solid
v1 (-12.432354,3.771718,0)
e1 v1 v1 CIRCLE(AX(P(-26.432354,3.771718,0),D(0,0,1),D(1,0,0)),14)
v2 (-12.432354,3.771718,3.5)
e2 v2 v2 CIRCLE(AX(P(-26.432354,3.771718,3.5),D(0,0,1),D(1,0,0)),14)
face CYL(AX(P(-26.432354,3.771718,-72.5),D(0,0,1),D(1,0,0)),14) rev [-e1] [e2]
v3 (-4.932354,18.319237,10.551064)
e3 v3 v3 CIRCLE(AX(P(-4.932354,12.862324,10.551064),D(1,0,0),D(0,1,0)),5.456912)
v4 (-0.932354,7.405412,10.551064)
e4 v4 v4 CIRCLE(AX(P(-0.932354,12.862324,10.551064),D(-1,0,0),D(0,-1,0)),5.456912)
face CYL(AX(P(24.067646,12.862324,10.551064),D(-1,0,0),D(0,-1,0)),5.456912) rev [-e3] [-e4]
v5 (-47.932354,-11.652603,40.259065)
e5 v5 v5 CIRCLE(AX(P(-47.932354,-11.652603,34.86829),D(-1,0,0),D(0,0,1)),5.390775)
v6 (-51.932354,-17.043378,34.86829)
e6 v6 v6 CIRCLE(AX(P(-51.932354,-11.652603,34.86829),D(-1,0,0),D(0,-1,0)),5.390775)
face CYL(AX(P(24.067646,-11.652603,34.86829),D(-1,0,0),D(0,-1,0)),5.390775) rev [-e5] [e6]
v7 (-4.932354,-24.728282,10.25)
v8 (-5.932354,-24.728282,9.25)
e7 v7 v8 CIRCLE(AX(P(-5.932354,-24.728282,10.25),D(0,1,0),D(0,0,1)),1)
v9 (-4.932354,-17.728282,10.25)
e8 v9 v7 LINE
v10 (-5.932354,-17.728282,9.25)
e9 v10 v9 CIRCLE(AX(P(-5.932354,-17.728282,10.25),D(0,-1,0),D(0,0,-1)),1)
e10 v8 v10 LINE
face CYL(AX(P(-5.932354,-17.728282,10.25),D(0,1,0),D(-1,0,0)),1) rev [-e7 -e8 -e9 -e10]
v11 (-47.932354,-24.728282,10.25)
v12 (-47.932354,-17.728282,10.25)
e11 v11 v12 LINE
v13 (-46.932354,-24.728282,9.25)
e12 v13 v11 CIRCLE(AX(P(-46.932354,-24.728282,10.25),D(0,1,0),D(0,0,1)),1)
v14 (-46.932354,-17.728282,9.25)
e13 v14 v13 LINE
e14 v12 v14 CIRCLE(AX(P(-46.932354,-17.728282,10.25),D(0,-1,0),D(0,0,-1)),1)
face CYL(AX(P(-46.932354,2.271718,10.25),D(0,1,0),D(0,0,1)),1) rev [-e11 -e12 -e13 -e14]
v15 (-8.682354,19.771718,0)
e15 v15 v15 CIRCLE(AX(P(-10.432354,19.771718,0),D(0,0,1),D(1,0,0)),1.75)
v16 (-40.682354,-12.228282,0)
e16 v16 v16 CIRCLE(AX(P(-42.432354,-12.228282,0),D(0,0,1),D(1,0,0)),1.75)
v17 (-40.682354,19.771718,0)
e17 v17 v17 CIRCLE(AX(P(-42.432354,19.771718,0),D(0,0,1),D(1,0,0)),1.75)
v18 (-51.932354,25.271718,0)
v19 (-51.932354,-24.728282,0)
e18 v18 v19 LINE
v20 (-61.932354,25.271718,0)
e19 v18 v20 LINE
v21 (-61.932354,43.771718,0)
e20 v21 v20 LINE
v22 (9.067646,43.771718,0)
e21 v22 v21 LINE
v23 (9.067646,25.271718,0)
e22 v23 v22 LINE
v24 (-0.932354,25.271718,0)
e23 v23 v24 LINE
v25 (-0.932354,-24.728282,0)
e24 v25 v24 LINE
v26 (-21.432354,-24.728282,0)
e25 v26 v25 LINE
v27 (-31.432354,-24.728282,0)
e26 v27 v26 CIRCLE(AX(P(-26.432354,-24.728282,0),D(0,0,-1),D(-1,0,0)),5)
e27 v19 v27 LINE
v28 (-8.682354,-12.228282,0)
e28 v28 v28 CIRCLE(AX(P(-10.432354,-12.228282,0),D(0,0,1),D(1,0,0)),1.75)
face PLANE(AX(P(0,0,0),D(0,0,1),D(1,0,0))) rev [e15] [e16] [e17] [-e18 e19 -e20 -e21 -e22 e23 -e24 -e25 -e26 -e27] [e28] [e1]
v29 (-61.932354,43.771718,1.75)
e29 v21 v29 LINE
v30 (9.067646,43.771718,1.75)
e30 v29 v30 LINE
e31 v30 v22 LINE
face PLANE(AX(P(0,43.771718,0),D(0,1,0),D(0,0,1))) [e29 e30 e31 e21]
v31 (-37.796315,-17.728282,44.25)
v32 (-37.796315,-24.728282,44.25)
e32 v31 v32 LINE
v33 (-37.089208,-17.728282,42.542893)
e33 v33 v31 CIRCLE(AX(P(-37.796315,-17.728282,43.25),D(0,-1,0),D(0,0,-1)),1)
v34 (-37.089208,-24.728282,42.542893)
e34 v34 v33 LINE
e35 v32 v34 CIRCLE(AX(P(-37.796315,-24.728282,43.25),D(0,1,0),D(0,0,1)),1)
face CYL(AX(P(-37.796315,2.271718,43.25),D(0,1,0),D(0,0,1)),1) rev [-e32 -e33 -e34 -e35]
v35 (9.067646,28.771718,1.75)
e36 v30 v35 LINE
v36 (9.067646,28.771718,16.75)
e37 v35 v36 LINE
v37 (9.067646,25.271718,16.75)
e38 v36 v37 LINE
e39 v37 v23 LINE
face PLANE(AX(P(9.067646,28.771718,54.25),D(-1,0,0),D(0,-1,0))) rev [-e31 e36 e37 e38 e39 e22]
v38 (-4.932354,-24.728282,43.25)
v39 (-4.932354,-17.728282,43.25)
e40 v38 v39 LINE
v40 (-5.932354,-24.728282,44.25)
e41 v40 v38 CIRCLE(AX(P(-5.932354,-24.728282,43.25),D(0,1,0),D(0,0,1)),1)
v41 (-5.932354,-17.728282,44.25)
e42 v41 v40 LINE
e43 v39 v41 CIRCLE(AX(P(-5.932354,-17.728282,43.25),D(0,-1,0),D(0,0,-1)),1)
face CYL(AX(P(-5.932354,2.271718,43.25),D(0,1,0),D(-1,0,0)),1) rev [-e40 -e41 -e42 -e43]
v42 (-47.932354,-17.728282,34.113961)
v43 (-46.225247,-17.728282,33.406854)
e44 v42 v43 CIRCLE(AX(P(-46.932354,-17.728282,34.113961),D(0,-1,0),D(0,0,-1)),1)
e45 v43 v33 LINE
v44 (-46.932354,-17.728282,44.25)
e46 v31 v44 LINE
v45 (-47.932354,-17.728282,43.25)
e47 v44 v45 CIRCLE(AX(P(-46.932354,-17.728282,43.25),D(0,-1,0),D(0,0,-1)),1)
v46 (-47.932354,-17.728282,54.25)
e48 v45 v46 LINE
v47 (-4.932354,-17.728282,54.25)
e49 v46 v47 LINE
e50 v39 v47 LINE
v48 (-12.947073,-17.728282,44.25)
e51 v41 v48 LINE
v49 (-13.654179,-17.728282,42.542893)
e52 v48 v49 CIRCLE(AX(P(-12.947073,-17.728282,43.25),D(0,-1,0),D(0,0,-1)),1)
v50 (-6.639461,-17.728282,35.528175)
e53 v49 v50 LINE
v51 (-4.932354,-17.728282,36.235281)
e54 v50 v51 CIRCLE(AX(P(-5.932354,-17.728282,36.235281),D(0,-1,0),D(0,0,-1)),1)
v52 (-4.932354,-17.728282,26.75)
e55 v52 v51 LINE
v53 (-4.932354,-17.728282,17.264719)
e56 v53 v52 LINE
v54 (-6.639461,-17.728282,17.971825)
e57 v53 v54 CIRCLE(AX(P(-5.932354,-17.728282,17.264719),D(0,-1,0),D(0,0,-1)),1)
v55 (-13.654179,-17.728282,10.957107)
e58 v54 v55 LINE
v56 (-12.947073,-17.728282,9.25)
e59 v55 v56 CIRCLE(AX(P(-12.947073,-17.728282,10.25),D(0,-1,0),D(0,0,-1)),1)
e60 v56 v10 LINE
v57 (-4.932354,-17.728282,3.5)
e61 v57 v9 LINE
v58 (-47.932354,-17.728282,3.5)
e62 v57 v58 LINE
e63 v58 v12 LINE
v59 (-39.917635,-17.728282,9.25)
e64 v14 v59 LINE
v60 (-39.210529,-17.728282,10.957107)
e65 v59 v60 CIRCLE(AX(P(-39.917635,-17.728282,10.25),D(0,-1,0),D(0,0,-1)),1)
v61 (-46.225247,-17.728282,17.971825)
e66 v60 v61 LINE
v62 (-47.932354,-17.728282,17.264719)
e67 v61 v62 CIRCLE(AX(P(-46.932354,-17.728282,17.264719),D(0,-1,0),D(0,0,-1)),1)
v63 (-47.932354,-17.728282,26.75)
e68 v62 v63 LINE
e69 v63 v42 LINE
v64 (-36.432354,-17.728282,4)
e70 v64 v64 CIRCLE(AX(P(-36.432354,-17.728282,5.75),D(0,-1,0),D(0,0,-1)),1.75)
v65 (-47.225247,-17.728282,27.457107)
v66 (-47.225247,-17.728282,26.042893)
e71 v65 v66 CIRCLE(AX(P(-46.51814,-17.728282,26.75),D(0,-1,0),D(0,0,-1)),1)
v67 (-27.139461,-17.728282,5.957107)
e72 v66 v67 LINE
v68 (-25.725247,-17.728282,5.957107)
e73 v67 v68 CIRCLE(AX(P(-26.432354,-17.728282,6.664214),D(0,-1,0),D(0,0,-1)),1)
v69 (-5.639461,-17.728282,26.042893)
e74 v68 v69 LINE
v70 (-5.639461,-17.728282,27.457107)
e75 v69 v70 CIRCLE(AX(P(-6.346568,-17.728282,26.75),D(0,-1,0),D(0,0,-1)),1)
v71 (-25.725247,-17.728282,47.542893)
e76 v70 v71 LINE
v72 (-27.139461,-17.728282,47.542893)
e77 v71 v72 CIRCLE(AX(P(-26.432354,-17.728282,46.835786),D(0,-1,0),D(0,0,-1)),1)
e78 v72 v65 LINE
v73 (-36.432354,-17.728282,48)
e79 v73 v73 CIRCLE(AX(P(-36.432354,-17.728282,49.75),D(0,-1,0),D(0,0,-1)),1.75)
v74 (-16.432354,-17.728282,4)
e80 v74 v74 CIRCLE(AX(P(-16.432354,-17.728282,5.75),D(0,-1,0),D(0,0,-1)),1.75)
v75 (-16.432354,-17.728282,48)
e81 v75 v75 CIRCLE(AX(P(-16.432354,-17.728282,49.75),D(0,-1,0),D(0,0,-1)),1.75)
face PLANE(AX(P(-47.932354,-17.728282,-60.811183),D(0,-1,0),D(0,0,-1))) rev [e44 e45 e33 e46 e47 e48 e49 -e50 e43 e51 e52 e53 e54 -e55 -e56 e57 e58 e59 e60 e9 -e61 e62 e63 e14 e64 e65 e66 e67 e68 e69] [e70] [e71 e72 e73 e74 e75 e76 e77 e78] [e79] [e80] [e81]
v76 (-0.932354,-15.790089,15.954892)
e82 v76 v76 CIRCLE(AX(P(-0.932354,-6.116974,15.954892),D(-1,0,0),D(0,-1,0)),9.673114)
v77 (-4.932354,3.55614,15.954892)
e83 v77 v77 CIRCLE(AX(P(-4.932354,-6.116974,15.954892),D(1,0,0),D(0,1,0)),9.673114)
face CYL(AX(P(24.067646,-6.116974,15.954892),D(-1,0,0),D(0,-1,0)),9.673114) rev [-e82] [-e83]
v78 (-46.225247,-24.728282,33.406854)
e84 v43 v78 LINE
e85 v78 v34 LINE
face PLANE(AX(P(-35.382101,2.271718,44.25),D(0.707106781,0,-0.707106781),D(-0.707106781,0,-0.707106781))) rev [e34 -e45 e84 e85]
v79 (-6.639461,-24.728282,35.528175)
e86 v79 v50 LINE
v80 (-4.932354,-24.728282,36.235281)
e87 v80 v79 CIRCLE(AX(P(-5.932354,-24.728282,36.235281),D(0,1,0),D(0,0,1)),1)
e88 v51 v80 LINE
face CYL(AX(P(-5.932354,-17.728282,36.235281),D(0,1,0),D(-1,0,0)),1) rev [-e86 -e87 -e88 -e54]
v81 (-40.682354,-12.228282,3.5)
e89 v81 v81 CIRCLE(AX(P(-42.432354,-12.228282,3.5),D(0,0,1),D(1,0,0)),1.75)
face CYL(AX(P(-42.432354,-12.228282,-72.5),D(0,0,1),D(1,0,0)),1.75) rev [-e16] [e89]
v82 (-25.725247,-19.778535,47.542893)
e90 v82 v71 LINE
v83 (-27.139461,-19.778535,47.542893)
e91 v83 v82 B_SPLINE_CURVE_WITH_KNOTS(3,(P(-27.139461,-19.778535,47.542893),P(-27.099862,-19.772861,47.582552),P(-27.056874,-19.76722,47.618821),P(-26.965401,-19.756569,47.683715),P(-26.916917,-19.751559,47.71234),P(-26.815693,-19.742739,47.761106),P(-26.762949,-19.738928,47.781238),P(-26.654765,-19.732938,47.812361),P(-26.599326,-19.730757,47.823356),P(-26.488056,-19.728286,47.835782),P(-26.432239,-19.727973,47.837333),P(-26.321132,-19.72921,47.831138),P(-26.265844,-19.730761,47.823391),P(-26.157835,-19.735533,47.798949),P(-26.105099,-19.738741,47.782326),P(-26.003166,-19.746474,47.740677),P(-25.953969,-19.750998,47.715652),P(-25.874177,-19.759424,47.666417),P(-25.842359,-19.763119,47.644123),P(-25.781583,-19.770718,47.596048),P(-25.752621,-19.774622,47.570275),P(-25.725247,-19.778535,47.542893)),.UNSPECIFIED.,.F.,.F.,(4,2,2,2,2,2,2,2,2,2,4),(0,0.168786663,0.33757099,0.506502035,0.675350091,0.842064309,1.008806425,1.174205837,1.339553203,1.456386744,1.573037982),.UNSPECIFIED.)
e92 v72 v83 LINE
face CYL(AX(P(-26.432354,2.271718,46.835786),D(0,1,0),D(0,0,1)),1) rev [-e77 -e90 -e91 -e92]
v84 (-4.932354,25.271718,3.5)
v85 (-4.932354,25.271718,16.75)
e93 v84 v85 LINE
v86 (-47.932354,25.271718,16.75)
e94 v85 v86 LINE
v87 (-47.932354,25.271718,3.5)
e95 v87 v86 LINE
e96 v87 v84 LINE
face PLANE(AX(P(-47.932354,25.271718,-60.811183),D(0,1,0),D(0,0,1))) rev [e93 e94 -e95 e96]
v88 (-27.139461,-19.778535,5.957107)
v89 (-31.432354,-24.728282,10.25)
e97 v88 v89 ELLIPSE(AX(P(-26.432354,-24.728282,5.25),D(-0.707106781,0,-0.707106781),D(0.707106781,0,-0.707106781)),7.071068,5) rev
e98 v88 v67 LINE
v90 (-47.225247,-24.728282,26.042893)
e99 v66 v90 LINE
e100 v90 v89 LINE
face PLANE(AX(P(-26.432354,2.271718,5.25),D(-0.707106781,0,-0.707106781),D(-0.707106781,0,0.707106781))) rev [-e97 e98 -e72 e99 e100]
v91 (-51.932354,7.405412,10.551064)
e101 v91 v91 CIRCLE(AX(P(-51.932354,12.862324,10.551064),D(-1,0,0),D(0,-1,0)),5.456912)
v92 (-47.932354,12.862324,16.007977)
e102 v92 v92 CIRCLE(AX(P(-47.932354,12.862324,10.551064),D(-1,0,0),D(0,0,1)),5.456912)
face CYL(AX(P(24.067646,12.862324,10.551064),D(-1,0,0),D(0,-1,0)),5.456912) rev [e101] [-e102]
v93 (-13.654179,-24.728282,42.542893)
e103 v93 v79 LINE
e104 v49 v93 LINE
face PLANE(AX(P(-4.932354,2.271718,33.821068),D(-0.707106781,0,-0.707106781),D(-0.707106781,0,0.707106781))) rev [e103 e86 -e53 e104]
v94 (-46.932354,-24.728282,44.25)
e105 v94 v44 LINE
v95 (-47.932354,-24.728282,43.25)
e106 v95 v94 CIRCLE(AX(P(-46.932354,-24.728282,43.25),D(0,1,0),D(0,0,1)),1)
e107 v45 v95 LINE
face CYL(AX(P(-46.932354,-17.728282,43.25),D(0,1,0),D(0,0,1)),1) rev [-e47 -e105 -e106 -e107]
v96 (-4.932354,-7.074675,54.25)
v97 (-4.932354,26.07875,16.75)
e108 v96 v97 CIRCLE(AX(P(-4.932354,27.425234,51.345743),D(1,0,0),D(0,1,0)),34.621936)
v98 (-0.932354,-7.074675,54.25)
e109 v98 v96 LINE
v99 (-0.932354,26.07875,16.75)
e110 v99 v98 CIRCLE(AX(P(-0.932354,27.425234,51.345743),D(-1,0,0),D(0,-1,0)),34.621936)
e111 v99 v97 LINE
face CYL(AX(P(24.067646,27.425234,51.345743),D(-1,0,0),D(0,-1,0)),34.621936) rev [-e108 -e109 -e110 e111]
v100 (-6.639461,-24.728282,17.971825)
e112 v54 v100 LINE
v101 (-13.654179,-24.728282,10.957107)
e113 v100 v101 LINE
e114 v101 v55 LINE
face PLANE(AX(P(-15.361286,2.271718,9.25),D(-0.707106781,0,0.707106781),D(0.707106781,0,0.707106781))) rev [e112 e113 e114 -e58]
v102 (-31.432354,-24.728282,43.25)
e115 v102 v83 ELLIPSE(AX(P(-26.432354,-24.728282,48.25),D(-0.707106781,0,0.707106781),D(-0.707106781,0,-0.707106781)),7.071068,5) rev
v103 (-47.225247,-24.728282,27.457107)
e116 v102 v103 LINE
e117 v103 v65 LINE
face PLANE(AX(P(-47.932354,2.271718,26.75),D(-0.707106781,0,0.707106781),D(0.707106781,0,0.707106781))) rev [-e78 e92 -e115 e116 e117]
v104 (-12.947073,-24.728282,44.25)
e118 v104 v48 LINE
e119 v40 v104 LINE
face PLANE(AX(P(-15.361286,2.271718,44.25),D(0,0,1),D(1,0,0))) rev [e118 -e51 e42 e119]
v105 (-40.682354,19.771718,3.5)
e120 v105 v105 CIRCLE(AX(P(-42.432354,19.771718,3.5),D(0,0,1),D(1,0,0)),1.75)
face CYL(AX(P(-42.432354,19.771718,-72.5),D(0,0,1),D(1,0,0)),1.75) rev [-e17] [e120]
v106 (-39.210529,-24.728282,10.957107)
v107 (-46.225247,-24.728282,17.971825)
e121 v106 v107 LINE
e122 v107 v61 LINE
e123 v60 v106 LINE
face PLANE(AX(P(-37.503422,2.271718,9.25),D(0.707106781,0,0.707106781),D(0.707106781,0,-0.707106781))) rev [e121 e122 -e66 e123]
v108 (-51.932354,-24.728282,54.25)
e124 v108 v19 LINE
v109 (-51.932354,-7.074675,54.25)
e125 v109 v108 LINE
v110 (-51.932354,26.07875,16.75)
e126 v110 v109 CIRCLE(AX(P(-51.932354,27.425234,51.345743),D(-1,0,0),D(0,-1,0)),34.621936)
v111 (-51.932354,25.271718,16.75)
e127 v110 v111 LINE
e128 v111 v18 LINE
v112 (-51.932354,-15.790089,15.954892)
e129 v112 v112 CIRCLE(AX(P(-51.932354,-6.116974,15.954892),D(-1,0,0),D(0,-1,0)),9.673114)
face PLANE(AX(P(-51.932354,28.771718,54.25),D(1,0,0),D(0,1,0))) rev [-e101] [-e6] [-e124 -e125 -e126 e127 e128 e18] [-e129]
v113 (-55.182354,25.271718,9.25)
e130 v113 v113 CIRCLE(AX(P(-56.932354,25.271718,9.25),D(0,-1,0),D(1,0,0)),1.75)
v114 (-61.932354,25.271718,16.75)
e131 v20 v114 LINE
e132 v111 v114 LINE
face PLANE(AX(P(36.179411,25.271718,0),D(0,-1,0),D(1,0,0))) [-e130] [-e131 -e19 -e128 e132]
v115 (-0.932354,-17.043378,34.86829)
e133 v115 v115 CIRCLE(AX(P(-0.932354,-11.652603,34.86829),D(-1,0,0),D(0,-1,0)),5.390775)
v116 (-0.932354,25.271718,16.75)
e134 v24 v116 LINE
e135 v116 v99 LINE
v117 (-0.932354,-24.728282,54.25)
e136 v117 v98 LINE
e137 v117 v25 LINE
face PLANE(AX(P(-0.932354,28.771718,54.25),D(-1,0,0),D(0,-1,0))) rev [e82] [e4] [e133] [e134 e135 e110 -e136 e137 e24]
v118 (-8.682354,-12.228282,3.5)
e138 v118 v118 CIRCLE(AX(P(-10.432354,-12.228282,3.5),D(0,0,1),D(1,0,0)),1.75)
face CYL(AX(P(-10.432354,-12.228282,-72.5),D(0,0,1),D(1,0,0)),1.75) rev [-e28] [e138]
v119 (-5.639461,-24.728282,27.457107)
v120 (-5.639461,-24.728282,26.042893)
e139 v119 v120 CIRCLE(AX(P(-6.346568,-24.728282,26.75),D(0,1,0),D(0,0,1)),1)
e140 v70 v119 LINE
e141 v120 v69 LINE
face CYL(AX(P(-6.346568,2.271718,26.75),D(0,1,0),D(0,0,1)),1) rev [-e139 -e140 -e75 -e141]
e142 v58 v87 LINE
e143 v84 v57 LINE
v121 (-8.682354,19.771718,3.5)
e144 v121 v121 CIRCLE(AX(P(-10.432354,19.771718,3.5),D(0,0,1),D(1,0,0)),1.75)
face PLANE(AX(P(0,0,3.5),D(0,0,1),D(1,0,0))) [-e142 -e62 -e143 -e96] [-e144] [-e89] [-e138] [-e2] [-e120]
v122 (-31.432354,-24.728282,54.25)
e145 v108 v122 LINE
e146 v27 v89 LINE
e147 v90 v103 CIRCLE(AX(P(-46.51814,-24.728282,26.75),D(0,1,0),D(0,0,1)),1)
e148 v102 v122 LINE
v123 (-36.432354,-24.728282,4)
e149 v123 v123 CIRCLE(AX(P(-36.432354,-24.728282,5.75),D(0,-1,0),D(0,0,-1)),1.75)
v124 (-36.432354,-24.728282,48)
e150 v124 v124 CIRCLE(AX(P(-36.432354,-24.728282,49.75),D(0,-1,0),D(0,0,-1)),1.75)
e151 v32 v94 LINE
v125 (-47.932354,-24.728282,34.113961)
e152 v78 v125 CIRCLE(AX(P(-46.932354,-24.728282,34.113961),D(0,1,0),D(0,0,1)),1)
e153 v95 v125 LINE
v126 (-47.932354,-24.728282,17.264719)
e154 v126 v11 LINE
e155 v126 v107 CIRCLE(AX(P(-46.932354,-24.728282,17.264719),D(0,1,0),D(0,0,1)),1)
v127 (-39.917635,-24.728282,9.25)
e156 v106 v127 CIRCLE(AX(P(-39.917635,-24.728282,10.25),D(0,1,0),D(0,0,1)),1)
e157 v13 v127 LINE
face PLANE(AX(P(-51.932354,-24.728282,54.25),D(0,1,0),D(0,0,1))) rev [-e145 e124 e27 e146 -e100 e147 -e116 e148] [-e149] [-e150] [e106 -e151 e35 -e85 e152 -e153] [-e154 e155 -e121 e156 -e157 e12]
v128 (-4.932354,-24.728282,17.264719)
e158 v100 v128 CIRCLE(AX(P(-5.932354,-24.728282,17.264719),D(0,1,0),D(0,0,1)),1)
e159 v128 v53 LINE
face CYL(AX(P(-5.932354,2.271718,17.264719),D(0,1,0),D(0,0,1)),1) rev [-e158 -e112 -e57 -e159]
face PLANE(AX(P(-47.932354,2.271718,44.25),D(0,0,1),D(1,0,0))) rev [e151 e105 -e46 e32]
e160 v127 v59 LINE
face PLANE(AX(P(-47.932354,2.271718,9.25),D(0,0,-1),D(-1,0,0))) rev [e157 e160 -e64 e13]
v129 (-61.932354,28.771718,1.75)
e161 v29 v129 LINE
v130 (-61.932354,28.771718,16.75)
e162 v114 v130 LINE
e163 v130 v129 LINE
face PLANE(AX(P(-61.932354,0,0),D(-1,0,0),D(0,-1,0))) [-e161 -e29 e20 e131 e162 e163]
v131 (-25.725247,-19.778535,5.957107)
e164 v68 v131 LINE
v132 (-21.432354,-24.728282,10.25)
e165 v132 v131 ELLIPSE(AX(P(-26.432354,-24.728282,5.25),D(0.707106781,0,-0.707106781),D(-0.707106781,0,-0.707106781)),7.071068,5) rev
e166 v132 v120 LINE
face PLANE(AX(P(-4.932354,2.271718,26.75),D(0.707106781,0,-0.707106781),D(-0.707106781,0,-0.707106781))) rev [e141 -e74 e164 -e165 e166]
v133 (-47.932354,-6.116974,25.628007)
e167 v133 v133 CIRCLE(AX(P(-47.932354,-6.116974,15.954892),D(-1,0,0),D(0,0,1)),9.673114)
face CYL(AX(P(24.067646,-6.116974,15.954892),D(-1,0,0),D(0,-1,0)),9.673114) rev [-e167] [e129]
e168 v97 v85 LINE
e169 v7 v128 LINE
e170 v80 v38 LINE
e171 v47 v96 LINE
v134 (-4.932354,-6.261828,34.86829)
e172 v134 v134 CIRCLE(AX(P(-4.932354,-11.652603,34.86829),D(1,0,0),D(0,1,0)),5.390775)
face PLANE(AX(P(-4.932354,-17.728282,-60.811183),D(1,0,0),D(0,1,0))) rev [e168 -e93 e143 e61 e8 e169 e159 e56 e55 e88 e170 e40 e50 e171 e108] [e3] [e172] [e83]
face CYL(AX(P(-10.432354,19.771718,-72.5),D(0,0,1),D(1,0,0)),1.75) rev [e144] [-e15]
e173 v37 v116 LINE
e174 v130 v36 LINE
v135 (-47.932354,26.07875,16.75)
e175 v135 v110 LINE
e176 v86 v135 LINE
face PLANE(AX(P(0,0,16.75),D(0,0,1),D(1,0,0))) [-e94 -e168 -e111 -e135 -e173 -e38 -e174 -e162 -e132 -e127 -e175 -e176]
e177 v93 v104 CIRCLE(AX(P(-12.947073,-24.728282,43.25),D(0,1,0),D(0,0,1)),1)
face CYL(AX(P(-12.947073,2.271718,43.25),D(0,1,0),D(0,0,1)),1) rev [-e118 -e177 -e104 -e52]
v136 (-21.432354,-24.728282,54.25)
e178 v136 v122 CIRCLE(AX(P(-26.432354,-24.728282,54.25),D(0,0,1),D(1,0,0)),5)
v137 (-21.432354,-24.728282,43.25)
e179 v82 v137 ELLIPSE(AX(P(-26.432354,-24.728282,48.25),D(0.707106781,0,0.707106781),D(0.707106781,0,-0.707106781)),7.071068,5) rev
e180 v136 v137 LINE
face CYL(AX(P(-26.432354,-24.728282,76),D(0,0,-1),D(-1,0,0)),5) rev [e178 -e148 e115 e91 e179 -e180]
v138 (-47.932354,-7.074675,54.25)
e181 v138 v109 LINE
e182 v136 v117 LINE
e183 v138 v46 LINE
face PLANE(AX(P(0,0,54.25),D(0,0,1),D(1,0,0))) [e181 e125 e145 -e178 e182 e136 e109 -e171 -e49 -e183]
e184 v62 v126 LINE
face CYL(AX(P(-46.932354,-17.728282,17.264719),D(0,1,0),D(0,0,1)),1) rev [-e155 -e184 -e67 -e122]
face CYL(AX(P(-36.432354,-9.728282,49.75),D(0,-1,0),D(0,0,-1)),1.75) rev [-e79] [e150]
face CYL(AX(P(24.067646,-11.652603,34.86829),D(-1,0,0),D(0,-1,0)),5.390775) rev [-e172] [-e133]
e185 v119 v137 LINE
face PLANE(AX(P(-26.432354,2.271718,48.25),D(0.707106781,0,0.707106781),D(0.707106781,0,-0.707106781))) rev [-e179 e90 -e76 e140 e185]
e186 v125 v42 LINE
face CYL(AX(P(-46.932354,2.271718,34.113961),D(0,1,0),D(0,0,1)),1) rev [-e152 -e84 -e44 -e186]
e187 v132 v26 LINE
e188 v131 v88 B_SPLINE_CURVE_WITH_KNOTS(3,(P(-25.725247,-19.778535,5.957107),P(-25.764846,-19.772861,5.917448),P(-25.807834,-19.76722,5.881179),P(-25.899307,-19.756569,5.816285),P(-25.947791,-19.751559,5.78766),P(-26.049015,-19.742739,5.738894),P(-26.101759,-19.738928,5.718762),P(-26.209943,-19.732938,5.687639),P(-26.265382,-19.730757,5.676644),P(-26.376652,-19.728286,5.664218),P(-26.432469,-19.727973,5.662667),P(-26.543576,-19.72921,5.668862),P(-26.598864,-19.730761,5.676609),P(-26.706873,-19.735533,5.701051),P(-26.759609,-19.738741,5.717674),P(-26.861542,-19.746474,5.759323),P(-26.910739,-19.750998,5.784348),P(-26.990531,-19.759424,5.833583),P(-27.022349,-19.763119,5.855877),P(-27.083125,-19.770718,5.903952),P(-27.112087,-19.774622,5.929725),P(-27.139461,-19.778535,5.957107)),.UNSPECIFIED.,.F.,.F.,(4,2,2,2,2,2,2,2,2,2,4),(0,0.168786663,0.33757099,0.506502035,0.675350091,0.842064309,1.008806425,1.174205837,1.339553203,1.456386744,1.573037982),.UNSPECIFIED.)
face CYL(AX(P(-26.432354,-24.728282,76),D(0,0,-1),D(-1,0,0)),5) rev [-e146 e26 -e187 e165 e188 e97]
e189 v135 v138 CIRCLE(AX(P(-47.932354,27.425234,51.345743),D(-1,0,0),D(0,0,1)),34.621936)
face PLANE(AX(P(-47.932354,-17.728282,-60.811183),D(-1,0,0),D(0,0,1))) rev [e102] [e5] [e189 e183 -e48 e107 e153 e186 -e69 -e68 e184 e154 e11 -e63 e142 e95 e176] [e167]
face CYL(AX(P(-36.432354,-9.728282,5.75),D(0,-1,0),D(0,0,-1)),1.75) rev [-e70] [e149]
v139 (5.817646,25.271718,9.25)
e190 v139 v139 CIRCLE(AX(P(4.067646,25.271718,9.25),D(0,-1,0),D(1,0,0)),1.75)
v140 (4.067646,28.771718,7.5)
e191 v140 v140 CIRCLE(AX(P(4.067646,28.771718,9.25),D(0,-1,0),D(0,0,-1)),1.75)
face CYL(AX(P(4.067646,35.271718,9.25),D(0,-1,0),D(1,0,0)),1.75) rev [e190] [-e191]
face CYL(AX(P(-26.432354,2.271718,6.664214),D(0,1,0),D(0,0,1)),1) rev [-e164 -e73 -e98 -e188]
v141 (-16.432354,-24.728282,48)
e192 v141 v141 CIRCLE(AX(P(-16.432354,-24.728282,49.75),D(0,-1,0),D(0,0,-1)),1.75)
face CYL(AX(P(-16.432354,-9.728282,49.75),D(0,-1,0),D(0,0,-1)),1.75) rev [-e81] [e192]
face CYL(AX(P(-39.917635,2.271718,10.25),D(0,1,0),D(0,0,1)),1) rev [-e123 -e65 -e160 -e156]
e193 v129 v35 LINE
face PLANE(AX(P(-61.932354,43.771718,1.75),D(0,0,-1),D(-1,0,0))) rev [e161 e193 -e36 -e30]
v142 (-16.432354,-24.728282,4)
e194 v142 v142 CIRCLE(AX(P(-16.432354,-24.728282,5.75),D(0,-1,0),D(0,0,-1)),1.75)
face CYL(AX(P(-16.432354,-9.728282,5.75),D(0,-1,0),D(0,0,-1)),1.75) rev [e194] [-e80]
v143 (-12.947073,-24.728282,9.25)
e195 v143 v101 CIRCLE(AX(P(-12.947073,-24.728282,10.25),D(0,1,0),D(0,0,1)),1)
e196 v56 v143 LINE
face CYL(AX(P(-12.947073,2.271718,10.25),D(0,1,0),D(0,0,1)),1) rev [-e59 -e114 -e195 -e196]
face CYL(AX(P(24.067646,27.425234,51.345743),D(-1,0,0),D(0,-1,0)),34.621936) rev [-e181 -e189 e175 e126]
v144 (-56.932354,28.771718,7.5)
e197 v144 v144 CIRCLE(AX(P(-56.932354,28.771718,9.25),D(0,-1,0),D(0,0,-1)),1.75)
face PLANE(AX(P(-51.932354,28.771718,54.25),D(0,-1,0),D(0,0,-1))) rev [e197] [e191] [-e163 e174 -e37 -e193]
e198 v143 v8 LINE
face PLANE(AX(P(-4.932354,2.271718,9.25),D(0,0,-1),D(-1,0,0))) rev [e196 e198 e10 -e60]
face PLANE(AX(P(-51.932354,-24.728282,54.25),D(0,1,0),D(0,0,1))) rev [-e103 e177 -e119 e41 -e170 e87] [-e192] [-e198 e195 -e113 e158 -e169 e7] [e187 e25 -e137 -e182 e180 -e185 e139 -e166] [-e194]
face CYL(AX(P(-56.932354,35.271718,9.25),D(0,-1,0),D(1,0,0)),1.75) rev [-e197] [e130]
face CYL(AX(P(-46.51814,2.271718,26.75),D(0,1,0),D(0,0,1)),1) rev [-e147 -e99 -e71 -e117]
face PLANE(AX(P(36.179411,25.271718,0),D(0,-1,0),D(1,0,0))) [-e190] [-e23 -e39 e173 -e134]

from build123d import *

# Parameters (mm, degrees)
SKETCH1_W                = 51
SKETCH1_H                = 53.5
BOSS_EXTRUDE1_DEPTH      = 54.25
SKETCH2_W                = 43
SKETCH2_H                = 43
CUT_EXTRUDE1_DEPTH       = 50.75
SKETCH3_W                = 43
SKETCH3_H                = 3.5
CUT_EXTRUDE2_DEPTH       = 37.5
CUT_EXTRUDE3_DEPTH       = 76
SKETCH5_R                = 9.673114497
SKETCH5_R_2              = 5.390775308
SKETCH5_R_3              = 5.456912487
CUT_EXTRUDE4_DEPTH       = 76
SKETCH6_R                = 14
SKETCH6_R_2              = 1.75
CUT_EXTRUDE5_DEPTH       = 76
SKETCH7_R                = 5
CUT_EXTRUDE6_DEPTH       = 76
CUT_EXTRUDE7_DEPTH       = 27
FILLET2_R                = 1
SKETCH12_R               = 1.75
CUT_EXTRUDE8_DEPTH       = 15
BOSS_EXTRUDE4_DEPTH      = 10
BOSS_EXTRUDE4_DEPTH_BACK = 61
SKETCH13_W               = 16.75
SKETCH13_H               = 3.5
SKETCH14_W               = 71
SKETCH14_H               = 1.75
BOSS_EXTRUDE5_DEPTH      = 15
SKETCH15_R               = 1.75
CUT_EXTRUDE9_DEPTH       = 10


with BuildPart() as part:
    # Sketch1 → Boss-Extrude1 (new body)
    with BuildSketch(Plane.XY):
        with Locations((-26.432354029, 2.021717979)):
            Rectangle(SKETCH1_W, SKETCH1_H)
    extrude(amount=BOSS_EXTRUDE1_DEPTH)

    # Sketch2 → Cut-Extrude1 (cut)
    with BuildSketch(Plane.XY.offset(54.25)):
        with Locations((-26.432354029, 3.771717979)):
            Rectangle(SKETCH2_W, SKETCH2_H)
    extrude(amount=-CUT_EXTRUDE1_DEPTH, mode=Mode.SUBTRACT)

    # Sketch3 → Cut-Extrude2 (cut)
    with BuildSketch(Plane.XY.offset(54.25)):
        with Locations((-26.432354029, 27.021717979)):
            Rectangle(SKETCH3_W, SKETCH3_H)
    extrude(amount=-CUT_EXTRUDE2_DEPTH, mode=Mode.SUBTRACT)

    # Sketch4 → Cut-Extrude3 (cut)
    with BuildSketch(Plane.ZY.offset(51.932354029)):
        with BuildLine():
            Line((16.75, 28.771717979), (54.25, 28.771717979))
            Line((54.25, 28.771717979), (54.25, -7.074674815))
            ThreePointArc((54.25, -7.074674815), (27.422353926, 2.398250742), (16.75, 28.771717979))
        make_face()
    extrude(amount=-CUT_EXTRUDE3_DEPTH, mode=Mode.SUBTRACT)

    # Sketch5 → Cut-Extrude4 (cut)
    with BuildSketch(Plane.ZY.offset(51.932354029)):
        with Locations(Location((15.954892055, -6.11697424, 0), (0, 0, 270))):
            Circle(SKETCH5_R)
        with Locations(Location((34.868290168, -11.652602956, 0), (0, 0, 270))):
            Circle(SKETCH5_R_2)
        with Locations(Location((10.551064023, 12.862324215, 0), (0, 0, 270))):
            Circle(SKETCH5_R_3)
    extrude(amount=-CUT_EXTRUDE4_DEPTH, mode=Mode.SUBTRACT)

    # Sketch6 → Cut-Extrude5 (cut)
    with BuildSketch(Plane.XY.offset(3.5)):
        with Locations((-26.432354029, 3.771717979)):
            Circle(SKETCH6_R)
        with Locations((-10.432354029, 19.771717979)):
            Circle(SKETCH6_R_2)
        with Locations((-42.432354029, 19.771717979)):
            Circle(SKETCH6_R_2)
        with Locations((-42.432354029, -12.228282021)):
            Circle(SKETCH6_R_2)
        with Locations((-10.432354029, -12.228282021)):
            Circle(SKETCH6_R_2)
    extrude(amount=-CUT_EXTRUDE5_DEPTH, mode=Mode.SUBTRACT)

    # Sketch7 → Cut-Extrude6 (cut)
    with BuildSketch(Plane(origin=(0, 0, 0), x_dir=(-1, 0, 0), z_dir=(0, 0, -1))):
        with Locations((26.432354029, -24.728282021)):
            Circle(SKETCH7_R)
    extrude(amount=-CUT_EXTRUDE6_DEPTH, mode=Mode.SUBTRACT)

    # Sketch8 → Cut-Extrude7 (cut)
    with BuildSketch(Plane.XZ.offset(24.728282021)):
        Polygon((-26.432354029, 48.25), (-4.932354029, 26.75), (-26.432354029, 5.25), (-47.932354029, 26.75), align=None)
        Polygon((-15.361286217, 44.25), (-4.932354029, 44.25), (-4.932354029, 33.821067812), align=None)
        Polygon((-4.932354029, 9.25), (-15.361286217, 9.25), (-4.932354029, 19.678932188), align=None)
        Polygon((-47.932354029, 9.25), (-37.503421841, 9.25), (-47.932354029, 19.678932188), align=None)
        Polygon((-47.932354029, 44.25), (-35.382101497, 44.25), (-47.932354029, 31.699747468), align=None)
    extrude(amount=-CUT_EXTRUDE7_DEPTH, mode=Mode.SUBTRACT)

    # Fillet2
    # the kernel refuses this fillet: 1 mm, written as the material it adds along each edge
    with BuildSketch(Plane(origin=(-47.932354029, -24.728282021, 31.699747468), x_dir=(0, 0, 1), z_dir=(0, 1, 0)), Plane(origin=(-4.932354029, -24.728282021, 19.678932188), x_dir=(0, 0, -1), z_dir=(0, 1, 0))) as fillet2_piece_1:
        with BuildLine():
            CenterArc((FILLET2_R * 2.41421356237, FILLET2_R), FILLET2_R, 135, 135)
            Line((FILLET2_R * 1.70710678119, FILLET2_R * 1.70710678119), (0, 0))
            Line((0, 0), (FILLET2_R * 2.41421356237, 0))
        make_face()
    extrude(amount=7)
    with BuildSketch(Plane(origin=(-4.932354029, -24.728282021, 33.821067812), x_dir=(0, 0, 1), z_dir=(0, 1, 0)), Plane(origin=(-47.932354029, -24.728282021, 19.678932188), x_dir=(0, 0, -1), z_dir=(0, 1, 0)), Plane(origin=(-15.361286217, -24.728282021, 9.25), x_dir=(1, 0, 0), z_dir=(0, 1, 0)), Plane(origin=(-37.503421841, -24.728282021, 9.25), x_dir=(-0.7071067811865486, 0, 0.7071067811865465), z_dir=(0, 1, 0)), Plane(origin=(-35.382101497, -24.728282021, 44.25), x_dir=(-1, 0, 0), z_dir=(0, 1, 0)), Plane(origin=(-15.361286217, -24.728282021, 44.25), x_dir=(0.7071067811865479, 0, -0.7071067811865472), z_dir=(0, 1, 0))) as fillet2_piece_2:
        with BuildLine():
            CenterArc((FILLET2_R * 2.41421356237, -FILLET2_R), FILLET2_R, 90, 135)
            Line((FILLET2_R * 1.70710678119, -FILLET2_R * 1.70710678119), (0, 0))
            Line((0, 0), (FILLET2_R * 2.41421356237, 0))
        make_face()
    extrude(amount=7)
    with BuildSketch(Plane(origin=(-26.432354029, -22.228282021, 5.25), x_dir=(0.7071067811865436, 0, 0.7071067811865516), z_dir=(0, 1, 0))) as fillet2_piece_3_section:
        with BuildLine():
            CenterArc((FILLET2_R, -FILLET2_R), FILLET2_R, 90, 90)
            Line((0, -FILLET2_R), (0, 0))
            Line((0, 0), (FILLET2_R, 0))
        make_face()
    fillet2_piece_3 = extrude(amount=4.5, mode=Mode.PRIVATE)
    fillet2_piece_3 = fillet2_piece_3 - Plane(origin=(-26.432354029, -24.728282021, 5.570701766), x_dir=(-1, 0, 0), z_dir=(0, 0, -1)) * Cylinder(5, 14, mode=Mode.PRIVATE)
    add(fillet2_piece_3)
    with BuildSketch(Plane(origin=(-4.932354029, -24.728282021, 9.25), x_dir=(0, 0, 1), z_dir=(0, 1, 0)), Plane(origin=(-47.932354029, -24.728282021, 26.75), x_dir=(0.7071067811865476, 0, -0.7071067811865476), z_dir=(0, 1, 0)), Plane(origin=(-47.932354029, -24.728282021, 44.25), x_dir=(0, 0, -1), z_dir=(0, 1, 0))) as fillet2_piece_4:
        with BuildLine():
            CenterArc((FILLET2_R, -FILLET2_R), FILLET2_R, 90, 90)
            Line((0, -FILLET2_R), (0, 0))
            Line((0, 0), (FILLET2_R, 0))
        make_face()
    extrude(amount=7)
    with BuildSketch(Plane(origin=(-47.932354029, -24.728282021, 9.25), x_dir=(0, 0, 1), z_dir=(0, 1, 0)), Plane(origin=(-4.932354029, -24.728282021, 26.75), x_dir=(-0.707106781186544, 0, -0.7071067811865511), z_dir=(0, 1, 0)), Plane(origin=(-4.932354029, -24.728282021, 44.25), x_dir=(0, 0, -1), z_dir=(0, 1, 0))) as fillet2_piece_5:
        with BuildLine():
            CenterArc((FILLET2_R, FILLET2_R), FILLET2_R, 180, 90)
            Line((0, FILLET2_R), (0, 0))
            Line((0, 0), (FILLET2_R, 0))
        make_face()
    extrude(amount=7)
    with BuildSketch(Plane(origin=(-26.432354029, -22.228282021, 48.25), x_dir=(0.7071067811865476, 0, -0.7071067811865476), z_dir=(0, 1, 0))) as fillet2_piece_6_section:
        with BuildLine():
            CenterArc((FILLET2_R, FILLET2_R), FILLET2_R, 180, 90)
            Line((0, FILLET2_R), (0, 0))
            Line((0, 0), (FILLET2_R, 0))
        make_face()
    fillet2_piece_6 = extrude(amount=4.5, mode=Mode.PRIVATE)
    fillet2_piece_6 = fillet2_piece_6 - Plane(origin=(-26.432354029, -24.728282021, 47.9292983), x_dir=(-1, 0, 0), z_dir=(0, 0, -1)) * Cylinder(5, 14, mode=Mode.PRIVATE)
    add(fillet2_piece_6)

    # Sketch12 → Cut-Extrude8 (cut)
    with BuildSketch(Plane.XZ.offset(24.728282021)):
        with Locations(Location((-16.432354029, 49.75, 0), (0, 0, 270))):
            Circle(SKETCH12_R)
        with Locations(Location((-36.432354029, 49.75, 0), (0, 0, 270))):
            Circle(SKETCH12_R)
        with Locations(Location((-16.432354029, 5.75, 0), (0, 0, 270))):
            Circle(SKETCH12_R)
        with Locations(Location((-36.432354029, 5.75, 0), (0, 0, 270))):
            Circle(SKETCH12_R)
    extrude(amount=-CUT_EXTRUDE8_DEPTH, mode=Mode.SUBTRACT)

    # Sketch13 → Boss-Extrude4 (add, two sides: drawn at the far end of the back side and taken through both)
    with BuildSketch(Plane.ZY.offset(51.932354029).offset(-BOSS_EXTRUDE4_DEPTH_BACK)):
        with Locations((8.375, 27.021717979)):
            Rectangle(SKETCH13_W, SKETCH13_H)
    extrude(amount=BOSS_EXTRUDE4_DEPTH + BOSS_EXTRUDE4_DEPTH_BACK)

    # Sketch14 → Boss-Extrude5 (add)
    with BuildSketch(Plane(origin=(0, 28.771717979, 0), x_dir=(1, 0, 0), z_dir=(0, 1, 0))):
        with Locations((-26.432354029, -0.875)):
            Rectangle(SKETCH14_W, SKETCH14_H)
    extrude(amount=BOSS_EXTRUDE5_DEPTH)

    # Sketch15 → Cut-Extrude9 (cut)
    with BuildSketch(Plane.XZ.offset(-25.271717979)):
        with Locations((-56.932354029, 9.25)):
            Circle(SKETCH15_R)
        with Locations((4.067645971, 9.25)):
            Circle(SKETCH15_R)
    extrude(amount=-CUT_EXTRUDE9_DEPTH, mode=Mode.SUBTRACT)


solid = part.part
